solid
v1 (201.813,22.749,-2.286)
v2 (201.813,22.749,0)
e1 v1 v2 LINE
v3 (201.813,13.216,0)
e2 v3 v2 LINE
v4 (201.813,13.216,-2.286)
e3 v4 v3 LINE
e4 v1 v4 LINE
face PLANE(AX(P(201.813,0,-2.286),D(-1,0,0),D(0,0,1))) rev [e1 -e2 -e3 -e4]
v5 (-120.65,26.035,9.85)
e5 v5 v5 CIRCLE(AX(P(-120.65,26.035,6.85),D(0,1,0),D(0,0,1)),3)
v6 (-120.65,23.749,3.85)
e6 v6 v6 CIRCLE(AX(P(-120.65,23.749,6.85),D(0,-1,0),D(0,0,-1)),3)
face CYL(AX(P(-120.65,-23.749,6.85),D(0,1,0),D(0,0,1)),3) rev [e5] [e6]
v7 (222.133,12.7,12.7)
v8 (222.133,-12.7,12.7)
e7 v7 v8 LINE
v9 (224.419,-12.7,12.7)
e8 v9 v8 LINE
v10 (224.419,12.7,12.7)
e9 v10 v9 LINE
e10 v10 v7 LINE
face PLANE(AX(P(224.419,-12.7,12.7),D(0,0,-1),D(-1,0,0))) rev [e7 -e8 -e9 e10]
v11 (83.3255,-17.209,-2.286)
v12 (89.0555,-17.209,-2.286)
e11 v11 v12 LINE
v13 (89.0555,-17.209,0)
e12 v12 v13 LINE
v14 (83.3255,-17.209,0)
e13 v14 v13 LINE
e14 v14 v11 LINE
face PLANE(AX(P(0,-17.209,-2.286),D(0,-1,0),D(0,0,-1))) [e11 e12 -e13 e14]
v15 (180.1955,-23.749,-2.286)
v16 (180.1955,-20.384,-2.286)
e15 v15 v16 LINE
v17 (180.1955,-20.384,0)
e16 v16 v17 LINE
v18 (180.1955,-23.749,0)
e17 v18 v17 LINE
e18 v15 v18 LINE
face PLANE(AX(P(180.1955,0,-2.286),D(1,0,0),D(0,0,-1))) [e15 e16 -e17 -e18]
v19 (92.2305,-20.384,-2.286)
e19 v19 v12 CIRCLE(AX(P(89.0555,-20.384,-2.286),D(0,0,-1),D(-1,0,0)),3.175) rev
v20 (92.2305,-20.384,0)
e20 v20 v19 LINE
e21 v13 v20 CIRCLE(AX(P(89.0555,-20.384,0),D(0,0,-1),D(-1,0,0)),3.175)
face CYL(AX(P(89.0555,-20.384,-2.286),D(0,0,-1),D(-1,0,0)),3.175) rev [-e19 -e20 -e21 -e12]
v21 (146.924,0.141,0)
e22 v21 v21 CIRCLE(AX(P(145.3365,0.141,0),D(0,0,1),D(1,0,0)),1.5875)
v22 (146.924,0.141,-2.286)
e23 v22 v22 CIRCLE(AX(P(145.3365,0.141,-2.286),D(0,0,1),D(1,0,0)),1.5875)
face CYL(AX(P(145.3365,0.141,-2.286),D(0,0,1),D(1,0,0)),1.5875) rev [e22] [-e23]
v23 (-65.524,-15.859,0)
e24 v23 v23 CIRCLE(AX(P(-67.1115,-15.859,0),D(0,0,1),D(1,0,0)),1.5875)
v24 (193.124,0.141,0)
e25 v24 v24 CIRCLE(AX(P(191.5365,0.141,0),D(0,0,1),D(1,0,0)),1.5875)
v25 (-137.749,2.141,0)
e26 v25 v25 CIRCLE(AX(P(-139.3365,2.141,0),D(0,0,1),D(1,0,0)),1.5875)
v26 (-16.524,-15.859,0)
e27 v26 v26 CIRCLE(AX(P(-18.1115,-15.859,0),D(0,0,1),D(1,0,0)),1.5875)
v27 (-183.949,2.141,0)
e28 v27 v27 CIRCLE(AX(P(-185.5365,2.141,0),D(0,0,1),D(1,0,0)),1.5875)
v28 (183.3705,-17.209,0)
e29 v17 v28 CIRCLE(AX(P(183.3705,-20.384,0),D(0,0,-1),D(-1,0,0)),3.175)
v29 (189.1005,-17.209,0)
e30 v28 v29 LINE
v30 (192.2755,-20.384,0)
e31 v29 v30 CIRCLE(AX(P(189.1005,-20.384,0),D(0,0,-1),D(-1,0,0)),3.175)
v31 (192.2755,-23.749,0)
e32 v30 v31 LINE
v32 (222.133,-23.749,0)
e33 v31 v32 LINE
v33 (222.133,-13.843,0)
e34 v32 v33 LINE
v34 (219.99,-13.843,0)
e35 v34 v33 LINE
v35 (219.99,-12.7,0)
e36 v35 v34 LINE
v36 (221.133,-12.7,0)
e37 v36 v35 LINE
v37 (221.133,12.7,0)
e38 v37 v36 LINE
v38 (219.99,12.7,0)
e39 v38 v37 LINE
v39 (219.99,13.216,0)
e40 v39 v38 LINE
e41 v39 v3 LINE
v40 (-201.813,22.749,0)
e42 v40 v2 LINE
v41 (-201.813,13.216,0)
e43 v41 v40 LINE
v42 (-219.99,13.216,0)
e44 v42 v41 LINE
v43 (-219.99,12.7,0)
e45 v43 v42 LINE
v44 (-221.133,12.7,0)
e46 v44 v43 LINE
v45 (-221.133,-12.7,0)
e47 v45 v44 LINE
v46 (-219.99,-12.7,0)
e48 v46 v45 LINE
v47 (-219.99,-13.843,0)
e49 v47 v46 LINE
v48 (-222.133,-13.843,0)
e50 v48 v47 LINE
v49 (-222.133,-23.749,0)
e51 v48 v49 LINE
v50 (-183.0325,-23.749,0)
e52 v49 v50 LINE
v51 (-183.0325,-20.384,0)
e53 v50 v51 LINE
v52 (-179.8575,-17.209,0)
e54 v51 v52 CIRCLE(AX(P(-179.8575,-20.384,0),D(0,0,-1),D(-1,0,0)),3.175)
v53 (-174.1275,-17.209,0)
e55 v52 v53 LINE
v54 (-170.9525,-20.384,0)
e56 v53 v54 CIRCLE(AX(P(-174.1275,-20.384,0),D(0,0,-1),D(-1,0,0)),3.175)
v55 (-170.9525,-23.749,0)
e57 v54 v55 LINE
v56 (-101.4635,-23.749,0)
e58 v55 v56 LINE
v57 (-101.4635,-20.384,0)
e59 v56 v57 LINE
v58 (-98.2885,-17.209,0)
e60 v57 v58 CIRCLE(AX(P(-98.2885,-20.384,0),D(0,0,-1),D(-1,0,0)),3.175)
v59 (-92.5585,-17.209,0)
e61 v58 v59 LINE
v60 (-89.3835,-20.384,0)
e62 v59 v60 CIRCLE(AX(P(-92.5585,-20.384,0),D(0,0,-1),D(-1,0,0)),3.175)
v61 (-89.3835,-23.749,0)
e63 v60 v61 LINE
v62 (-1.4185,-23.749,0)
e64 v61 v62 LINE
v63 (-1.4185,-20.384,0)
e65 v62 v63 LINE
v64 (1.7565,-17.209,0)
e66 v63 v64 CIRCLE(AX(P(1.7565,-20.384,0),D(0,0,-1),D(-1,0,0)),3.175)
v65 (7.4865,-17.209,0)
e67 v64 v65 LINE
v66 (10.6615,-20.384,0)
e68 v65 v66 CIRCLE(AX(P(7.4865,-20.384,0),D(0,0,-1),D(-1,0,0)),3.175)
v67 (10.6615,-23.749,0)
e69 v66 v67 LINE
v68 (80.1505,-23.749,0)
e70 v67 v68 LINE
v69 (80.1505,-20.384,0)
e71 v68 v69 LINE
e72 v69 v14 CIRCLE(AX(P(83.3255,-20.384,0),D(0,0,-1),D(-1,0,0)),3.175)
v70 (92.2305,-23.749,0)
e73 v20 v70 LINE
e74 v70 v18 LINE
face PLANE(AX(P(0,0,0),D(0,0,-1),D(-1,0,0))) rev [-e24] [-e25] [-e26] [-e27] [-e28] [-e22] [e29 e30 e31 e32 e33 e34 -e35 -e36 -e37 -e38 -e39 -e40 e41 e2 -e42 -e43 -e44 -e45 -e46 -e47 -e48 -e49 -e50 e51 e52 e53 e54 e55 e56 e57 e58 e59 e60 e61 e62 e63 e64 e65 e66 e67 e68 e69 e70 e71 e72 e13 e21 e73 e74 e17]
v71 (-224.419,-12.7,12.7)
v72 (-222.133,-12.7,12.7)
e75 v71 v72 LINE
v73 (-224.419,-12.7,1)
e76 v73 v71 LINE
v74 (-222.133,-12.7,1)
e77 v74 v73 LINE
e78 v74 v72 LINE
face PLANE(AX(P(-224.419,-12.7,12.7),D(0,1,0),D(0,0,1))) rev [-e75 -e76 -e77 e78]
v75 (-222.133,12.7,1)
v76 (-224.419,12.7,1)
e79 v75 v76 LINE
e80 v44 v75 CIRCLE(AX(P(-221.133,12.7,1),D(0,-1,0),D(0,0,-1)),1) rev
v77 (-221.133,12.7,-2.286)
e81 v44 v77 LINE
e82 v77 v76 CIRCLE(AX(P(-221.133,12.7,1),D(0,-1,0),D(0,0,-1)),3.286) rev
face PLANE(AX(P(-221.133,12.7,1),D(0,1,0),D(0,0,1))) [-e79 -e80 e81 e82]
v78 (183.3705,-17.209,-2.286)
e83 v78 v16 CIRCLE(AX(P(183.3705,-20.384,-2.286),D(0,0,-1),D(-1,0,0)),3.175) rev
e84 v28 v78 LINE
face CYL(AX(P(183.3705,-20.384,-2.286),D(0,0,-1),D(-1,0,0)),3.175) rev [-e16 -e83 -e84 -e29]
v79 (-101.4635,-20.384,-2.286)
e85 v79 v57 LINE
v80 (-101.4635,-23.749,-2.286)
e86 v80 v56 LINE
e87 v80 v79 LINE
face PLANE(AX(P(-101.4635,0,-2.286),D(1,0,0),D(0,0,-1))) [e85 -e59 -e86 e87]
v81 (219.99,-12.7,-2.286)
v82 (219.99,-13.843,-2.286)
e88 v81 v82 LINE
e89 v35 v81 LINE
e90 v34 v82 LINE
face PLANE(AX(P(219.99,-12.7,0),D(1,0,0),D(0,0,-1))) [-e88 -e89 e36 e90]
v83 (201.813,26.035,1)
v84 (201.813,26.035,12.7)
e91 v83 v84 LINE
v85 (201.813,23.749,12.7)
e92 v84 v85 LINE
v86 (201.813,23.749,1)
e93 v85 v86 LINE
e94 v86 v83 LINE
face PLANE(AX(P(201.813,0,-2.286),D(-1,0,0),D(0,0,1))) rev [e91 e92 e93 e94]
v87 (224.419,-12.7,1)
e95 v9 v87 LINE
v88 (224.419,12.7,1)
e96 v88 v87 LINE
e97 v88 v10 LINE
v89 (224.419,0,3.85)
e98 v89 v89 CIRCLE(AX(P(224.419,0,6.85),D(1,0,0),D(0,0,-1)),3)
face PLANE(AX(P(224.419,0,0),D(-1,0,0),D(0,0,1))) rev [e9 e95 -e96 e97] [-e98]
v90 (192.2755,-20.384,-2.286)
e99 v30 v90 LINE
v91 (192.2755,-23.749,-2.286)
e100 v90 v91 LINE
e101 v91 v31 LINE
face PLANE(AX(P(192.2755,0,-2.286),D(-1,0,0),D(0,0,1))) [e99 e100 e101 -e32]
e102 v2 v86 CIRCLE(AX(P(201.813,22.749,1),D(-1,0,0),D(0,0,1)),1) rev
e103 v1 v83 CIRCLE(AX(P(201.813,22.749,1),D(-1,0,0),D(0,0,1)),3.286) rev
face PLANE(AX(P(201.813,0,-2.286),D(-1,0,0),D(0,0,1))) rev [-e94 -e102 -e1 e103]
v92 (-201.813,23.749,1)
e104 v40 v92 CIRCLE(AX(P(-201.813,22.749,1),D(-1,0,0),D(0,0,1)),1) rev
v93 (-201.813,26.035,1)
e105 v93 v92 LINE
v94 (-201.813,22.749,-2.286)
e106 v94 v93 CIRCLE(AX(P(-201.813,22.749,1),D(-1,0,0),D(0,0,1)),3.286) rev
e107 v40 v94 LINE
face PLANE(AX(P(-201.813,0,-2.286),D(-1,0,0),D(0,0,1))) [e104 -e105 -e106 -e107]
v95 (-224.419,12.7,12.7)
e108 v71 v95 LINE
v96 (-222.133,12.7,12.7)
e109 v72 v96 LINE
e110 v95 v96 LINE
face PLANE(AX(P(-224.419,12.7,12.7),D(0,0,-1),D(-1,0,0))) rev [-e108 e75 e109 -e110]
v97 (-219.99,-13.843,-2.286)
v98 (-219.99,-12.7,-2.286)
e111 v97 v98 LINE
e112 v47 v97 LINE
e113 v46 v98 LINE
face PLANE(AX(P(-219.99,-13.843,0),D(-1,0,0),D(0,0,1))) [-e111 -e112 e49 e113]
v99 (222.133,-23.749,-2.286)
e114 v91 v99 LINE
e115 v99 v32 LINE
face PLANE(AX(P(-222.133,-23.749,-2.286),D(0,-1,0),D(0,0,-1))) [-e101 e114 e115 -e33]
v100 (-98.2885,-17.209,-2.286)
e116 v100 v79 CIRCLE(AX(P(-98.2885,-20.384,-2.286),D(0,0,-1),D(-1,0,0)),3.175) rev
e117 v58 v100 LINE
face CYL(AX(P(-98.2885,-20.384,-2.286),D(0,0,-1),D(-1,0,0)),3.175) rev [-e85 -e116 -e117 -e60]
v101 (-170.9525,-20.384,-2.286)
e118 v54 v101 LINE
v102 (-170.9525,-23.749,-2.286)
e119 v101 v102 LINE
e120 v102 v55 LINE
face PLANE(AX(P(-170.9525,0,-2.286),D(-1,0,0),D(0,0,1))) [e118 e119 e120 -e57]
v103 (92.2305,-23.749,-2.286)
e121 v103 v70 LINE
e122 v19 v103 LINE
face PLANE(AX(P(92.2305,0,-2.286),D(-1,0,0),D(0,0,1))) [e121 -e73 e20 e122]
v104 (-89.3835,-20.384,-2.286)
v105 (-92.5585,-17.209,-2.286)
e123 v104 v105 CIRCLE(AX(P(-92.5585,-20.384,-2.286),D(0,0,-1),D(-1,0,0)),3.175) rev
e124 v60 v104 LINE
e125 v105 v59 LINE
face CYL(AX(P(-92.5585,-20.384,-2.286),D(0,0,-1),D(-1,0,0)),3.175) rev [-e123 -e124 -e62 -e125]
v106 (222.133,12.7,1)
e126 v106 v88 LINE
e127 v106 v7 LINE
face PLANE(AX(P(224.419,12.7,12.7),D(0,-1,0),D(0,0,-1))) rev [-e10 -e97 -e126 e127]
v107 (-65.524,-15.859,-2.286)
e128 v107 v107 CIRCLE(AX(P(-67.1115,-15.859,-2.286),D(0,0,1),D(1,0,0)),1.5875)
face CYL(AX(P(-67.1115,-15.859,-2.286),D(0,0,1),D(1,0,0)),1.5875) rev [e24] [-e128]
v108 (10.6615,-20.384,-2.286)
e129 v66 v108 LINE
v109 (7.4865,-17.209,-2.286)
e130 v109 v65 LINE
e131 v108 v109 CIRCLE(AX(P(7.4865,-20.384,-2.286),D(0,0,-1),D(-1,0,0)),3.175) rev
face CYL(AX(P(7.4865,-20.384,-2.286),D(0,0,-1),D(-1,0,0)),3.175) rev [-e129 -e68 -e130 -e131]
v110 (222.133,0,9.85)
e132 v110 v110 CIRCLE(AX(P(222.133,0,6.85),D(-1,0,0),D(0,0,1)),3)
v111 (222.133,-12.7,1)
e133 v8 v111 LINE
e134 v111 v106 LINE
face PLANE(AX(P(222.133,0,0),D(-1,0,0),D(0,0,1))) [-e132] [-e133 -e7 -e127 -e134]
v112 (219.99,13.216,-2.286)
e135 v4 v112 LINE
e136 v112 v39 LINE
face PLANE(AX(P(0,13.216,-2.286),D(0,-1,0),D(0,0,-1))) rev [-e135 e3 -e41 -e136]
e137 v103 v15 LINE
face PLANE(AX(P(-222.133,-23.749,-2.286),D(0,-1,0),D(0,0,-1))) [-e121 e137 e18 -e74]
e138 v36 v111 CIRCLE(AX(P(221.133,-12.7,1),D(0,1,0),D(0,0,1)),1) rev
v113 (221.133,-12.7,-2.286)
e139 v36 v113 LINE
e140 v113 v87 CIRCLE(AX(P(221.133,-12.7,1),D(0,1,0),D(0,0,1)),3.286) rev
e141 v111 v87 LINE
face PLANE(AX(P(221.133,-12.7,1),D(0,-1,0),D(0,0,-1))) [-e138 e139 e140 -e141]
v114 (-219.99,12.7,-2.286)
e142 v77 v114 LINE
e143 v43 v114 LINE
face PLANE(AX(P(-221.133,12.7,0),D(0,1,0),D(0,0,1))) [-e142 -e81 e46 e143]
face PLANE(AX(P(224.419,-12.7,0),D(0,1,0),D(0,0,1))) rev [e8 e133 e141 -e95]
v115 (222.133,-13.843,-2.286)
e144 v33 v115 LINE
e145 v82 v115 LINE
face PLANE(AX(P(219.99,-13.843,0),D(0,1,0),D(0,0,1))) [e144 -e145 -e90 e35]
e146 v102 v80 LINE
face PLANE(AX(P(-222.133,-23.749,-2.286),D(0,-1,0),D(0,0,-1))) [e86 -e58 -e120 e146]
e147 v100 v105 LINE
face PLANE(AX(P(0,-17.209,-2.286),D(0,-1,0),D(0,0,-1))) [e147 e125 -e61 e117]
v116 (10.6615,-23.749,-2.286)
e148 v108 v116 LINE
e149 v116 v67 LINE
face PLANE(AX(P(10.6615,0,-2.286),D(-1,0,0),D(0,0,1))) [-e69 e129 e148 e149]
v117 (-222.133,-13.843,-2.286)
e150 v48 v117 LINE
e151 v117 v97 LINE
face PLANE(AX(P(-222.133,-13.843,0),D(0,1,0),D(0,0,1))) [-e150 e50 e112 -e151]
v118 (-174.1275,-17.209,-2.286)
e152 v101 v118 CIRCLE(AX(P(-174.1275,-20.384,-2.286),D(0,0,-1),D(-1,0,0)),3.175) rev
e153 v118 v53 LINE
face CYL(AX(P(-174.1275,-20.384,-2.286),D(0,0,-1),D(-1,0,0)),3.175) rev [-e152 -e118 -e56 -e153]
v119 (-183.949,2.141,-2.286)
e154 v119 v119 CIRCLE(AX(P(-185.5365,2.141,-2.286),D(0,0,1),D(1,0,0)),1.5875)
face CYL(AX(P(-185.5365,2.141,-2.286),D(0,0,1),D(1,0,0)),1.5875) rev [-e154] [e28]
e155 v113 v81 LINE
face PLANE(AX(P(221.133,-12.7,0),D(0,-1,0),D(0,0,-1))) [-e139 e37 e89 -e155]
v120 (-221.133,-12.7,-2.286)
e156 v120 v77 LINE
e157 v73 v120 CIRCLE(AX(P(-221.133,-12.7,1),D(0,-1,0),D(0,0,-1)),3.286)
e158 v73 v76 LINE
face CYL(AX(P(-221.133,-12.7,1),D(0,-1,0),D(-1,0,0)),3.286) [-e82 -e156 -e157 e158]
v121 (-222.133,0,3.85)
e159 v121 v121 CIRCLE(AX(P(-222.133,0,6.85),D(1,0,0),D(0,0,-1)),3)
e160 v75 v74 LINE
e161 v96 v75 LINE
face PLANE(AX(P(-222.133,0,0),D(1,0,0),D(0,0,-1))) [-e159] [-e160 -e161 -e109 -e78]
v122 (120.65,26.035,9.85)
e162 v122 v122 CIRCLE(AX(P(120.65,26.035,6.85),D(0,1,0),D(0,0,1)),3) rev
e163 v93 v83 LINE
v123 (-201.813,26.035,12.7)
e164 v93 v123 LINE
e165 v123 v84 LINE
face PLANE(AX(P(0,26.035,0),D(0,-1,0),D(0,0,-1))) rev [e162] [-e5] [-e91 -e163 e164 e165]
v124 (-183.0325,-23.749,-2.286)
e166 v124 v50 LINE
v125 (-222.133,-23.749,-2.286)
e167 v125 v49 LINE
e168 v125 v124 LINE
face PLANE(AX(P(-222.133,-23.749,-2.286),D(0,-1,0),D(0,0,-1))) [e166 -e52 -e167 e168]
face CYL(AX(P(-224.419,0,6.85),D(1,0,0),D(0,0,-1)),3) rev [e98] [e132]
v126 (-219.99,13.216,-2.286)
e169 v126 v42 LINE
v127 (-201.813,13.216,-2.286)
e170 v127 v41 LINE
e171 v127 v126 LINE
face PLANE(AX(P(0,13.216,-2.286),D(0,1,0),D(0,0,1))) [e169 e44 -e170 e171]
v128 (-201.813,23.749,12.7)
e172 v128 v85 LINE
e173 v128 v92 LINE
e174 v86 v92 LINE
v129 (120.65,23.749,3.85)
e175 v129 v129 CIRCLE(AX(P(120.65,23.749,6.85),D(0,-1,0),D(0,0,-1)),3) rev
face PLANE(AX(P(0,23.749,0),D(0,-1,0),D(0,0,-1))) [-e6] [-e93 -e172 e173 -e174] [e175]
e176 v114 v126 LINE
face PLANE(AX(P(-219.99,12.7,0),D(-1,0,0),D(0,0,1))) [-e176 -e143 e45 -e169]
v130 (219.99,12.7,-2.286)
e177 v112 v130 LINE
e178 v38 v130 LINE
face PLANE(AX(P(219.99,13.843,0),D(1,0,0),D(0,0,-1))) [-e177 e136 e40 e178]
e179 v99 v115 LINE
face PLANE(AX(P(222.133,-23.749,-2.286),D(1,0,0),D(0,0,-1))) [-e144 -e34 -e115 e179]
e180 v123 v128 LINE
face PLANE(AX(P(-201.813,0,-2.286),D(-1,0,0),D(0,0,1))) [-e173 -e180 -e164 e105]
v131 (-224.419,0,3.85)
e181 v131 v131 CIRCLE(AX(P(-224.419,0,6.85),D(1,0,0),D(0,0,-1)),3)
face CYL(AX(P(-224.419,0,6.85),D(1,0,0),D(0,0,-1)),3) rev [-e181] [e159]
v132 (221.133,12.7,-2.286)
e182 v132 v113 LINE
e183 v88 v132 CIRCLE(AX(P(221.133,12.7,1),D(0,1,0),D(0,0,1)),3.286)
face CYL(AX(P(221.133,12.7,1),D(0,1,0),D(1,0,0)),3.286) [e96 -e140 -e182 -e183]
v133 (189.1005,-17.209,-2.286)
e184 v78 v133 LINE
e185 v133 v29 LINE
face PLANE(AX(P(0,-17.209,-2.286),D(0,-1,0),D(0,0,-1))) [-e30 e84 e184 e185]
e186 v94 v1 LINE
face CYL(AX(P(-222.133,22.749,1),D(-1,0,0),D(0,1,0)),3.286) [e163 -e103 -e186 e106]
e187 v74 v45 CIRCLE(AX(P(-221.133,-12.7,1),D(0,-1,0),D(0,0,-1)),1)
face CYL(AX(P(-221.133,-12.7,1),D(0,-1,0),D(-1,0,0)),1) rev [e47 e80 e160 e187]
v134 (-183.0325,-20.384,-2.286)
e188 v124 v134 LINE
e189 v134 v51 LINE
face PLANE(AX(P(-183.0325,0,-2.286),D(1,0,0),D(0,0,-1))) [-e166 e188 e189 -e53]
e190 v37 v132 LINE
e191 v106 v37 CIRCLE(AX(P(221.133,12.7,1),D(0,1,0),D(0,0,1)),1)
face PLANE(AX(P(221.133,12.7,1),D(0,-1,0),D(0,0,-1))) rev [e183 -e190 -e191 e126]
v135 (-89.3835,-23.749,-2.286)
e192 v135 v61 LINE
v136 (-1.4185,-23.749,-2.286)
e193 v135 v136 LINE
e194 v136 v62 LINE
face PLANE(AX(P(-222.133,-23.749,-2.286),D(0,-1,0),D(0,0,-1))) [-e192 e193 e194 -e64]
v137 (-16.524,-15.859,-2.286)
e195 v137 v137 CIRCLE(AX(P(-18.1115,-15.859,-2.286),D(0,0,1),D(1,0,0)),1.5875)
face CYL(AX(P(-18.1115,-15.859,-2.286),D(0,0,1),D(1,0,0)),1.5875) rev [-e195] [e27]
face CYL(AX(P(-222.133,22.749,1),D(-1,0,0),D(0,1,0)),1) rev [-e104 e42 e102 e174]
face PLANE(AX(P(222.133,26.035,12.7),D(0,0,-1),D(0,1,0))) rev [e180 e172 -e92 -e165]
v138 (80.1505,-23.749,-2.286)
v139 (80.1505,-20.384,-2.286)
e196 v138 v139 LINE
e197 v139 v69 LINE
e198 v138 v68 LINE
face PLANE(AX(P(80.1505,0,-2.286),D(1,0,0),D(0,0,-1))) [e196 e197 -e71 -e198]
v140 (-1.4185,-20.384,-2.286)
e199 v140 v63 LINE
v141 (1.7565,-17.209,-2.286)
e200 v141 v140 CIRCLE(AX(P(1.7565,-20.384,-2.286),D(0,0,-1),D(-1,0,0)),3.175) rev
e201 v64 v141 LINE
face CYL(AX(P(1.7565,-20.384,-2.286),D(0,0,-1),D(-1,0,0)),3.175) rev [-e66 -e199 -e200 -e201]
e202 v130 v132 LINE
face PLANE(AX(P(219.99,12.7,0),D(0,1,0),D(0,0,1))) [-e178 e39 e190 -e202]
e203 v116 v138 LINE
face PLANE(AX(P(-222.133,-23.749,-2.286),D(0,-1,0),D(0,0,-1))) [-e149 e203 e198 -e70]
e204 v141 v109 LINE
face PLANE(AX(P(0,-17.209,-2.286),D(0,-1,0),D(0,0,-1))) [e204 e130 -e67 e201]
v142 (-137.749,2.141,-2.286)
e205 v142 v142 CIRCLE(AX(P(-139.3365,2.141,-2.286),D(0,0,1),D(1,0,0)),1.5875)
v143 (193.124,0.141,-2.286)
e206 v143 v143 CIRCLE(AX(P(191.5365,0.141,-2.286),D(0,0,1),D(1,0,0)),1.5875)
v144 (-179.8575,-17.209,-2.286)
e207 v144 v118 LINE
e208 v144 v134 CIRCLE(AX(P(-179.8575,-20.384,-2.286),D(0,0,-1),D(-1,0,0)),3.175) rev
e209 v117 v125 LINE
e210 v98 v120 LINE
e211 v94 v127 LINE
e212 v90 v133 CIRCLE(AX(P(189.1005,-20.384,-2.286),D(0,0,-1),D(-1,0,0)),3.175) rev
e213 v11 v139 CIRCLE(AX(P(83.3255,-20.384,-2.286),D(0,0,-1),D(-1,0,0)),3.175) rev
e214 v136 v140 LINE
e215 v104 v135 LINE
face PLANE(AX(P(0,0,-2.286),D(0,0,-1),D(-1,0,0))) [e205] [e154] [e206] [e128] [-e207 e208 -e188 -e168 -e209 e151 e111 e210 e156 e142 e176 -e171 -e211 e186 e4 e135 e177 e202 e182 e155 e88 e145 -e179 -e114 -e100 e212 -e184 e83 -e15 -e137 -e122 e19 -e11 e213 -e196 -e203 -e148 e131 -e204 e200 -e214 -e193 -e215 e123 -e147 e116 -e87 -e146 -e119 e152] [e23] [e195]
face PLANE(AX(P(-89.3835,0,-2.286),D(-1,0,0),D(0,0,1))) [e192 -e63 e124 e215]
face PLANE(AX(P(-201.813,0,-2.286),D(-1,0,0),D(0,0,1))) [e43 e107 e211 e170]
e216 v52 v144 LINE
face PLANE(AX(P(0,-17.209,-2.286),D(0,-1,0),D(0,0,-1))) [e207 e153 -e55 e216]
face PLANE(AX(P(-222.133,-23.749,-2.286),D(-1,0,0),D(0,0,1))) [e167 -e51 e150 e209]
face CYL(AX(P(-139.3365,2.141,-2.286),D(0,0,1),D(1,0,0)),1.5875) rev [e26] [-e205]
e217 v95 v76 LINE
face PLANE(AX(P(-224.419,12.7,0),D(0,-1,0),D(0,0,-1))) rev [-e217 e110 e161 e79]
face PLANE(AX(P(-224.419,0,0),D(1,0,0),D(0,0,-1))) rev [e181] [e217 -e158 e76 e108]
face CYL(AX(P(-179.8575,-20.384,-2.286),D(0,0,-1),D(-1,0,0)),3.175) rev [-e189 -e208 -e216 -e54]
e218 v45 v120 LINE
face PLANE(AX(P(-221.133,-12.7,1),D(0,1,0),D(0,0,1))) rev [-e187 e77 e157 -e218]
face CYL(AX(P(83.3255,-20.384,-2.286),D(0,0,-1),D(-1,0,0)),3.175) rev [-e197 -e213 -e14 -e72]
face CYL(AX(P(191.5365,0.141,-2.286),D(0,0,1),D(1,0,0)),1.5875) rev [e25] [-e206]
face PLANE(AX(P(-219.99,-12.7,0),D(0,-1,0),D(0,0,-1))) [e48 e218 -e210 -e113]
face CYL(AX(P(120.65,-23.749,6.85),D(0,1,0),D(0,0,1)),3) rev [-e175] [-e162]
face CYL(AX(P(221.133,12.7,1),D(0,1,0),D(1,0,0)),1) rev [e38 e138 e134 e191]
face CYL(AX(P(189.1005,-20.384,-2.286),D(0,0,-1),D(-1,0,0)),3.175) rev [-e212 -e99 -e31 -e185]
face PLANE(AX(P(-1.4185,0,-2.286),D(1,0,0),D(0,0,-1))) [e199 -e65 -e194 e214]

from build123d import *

# Parameters (mm, degrees)
SKETCH1_W                     = 444.26599996
SKETCH1_H                     = 47.498
BASE_FLANGE1_DEPTH            = 2.286
EDGE_FLANGE1_STRIP_W          = 11.144
EDGE_FLANGE1_STRIP_H          = 2.286
EDGE_FLANGE1_STRIP_CUT_DEPTH  = 25.4
EDGE_FLANGE1_RELIEF_W         = 12.287
EDGE_FLANGE1_RELIEF_H         = 1.143
EDGE_FLANGE1_RELIEF_CUT_DEPTH = 2.286
EDGE_FLANGE1_DEPTH            = 25.4
EDGE_FLANGE2_STRIP_W          = 11.144
EDGE_FLANGE2_STRIP_H          = 2.286
EDGE_FLANGE2_STRIP_CUT_DEPTH  = 25.4
EDGE_FLANGE2_RELIEF_W         = 12.287
EDGE_FLANGE2_RELIEF_H         = 1.143
EDGE_FLANGE2_RELIEF_CUT_DEPTH = 2.286
EDGE_FLANGE2_DEPTH            = 25.4
EDGE_FLANGE6_STRIP_W          = 11.144
EDGE_FLANGE6_STRIP_H          = 2.286
EDGE_FLANGE6_STRIP_CUT_DEPTH  = 444.26599996
EDGE_FLANGE6_DEPTH            = 444.26599996
SKETCH52_R                    = 3
CUT_EXTRUDE2_DEPTH            = 231.225159807
SKETCH53_R                    = 3
CUT_EXTRUDE3_DEPTH            = 450.771788169
SKETCH54_W                    = 20.32
SKETCH54_H                    = 5.08
SKETCH54_H_2                  = 7.739
SKETCH54_H_3                  = 4.453
CUT_EXTRUDE4_DEPTH            = 227.280796306
CUT_EXTRUDE5_DEPTH            = 227.280796306
FILLET1_R                     = 3.175
SKETCH57_R                    = 1.5875
CUT_EXTRUDE6_DEPTH            = 227.280796306


# Sheet-metal steps are written as plain solids
with BuildPart() as part:
    # Sketch1 → Base-Flange1 (new body)
    with BuildSketch(Plane.XY):
        Rectangle(SKETCH1_W, SKETCH1_H)
    extrude(amount=-BASE_FLANGE1_DEPTH)

    # Edge-Flange1 strip (across the edge) → Edge-Flange1 strip cut (cut)
    with BuildSketch(Plane(origin=(222.13299998, -12.7, 0), x_dir=(-1, 0, 0), z_dir=(0, 1, 0))):
        with Locations((-4.572, -1.143)):
            Rectangle(EDGE_FLANGE1_STRIP_W, EDGE_FLANGE1_STRIP_H)
    extrude(amount=EDGE_FLANGE1_STRIP_CUT_DEPTH, mode=Mode.SUBTRACT)

    # Edge-Flange1 relief (on the sheet) → Edge-Flange1 relief cut (cut)
    with BuildSketch(Plane(origin=(221.13299998, -12.7, 0), x_dir=(-1, 0, 0), z_dir=(0, 0, 1))):
        with Locations((-5.0005, 0.5715)):
            Rectangle(EDGE_FLANGE1_RELIEF_W, EDGE_FLANGE1_RELIEF_H)
        with Locations((-5.0005, -25.9715)):
            Rectangle(EDGE_FLANGE1_RELIEF_W, EDGE_FLANGE1_RELIEF_H)
    extrude(amount=-EDGE_FLANGE1_RELIEF_CUT_DEPTH, mode=Mode.SUBTRACT)

    # Edge-Flange1 section (across the edge) → Edge-Flange1 (add)
    with BuildSketch(Plane(origin=(222.13299998, -12.7, 0), x_dir=(-1, 0, 0), z_dir=(0, 1, 0))):
        with BuildLine():
            Line((-2.286, 1), (-2.286, 12.7))
            Line((-2.286, 12.7), (0, 12.7))
            Line((0, 12.7), (0, 1))
            ThreePointArc((0, 1), (0.292893219, 0.292893219), (1, 0))
            Line((1, 0), (1, -2.286))
            ThreePointArc((1, -2.286), (-1.323552883, -1.323552883), (-2.286, 1))
        make_face()
    extrude(amount=EDGE_FLANGE1_DEPTH)

    # Edge-Flange2 strip (across the edge) → Edge-Flange2 strip cut (cut)
    with BuildSketch(Plane(origin=(-222.13299998, 12.7, 0), x_dir=(1, 0, 0), z_dir=(0, -1, 0))):
        with Locations((-4.572, -1.143)):
            Rectangle(EDGE_FLANGE2_STRIP_W, EDGE_FLANGE2_STRIP_H)
    extrude(amount=EDGE_FLANGE2_STRIP_CUT_DEPTH, mode=Mode.SUBTRACT)

    # Edge-Flange2 relief (on the sheet) → Edge-Flange2 relief cut (cut)
    with BuildSketch(Plane(origin=(-221.13299998, 12.7, 0), x_dir=(1, 0, 0), z_dir=(0, 0, 1))):
        with Locations((-5.0005, 0.5715)):
            Rectangle(EDGE_FLANGE2_RELIEF_W, EDGE_FLANGE2_RELIEF_H)
        with Locations((-5.0005, -25.9715)):
            Rectangle(EDGE_FLANGE2_RELIEF_W, EDGE_FLANGE2_RELIEF_H)
    extrude(amount=-EDGE_FLANGE2_RELIEF_CUT_DEPTH, mode=Mode.SUBTRACT)

    # Edge-Flange2 section (across the edge) → Edge-Flange2 (add)
    with BuildSketch(Plane(origin=(-222.13299998, 12.7, 0), x_dir=(1, 0, 0), z_dir=(0, -1, 0))):
        with BuildLine():
            Line((-2.286, 1), (-2.286, 12.7))
            Line((-2.286, 12.7), (0, 12.7))
            Line((0, 12.7), (0, 1))
            ThreePointArc((0, 1), (0.292893219, 0.292893219), (1, 0))
            Line((1, 0), (1, -2.286))
            ThreePointArc((1, -2.286), (-1.323552883, -1.323552883), (-2.286, 1))
        make_face()
    extrude(amount=EDGE_FLANGE2_DEPTH)

    # Edge-Flange6 strip (across the edge) → Edge-Flange6 strip cut (cut)
    with BuildSketch(Plane(origin=(222.13299998, 23.749, 0), x_dir=(0, -1, 0), z_dir=(-1, 0, 0))):
        with Locations((-4.572, -1.143)):
            Rectangle(EDGE_FLANGE6_STRIP_W, EDGE_FLANGE6_STRIP_H)
    extrude(amount=EDGE_FLANGE6_STRIP_CUT_DEPTH, mode=Mode.SUBTRACT)

    # Edge-Flange6 section (across the edge) → Edge-Flange6 (add)
    with BuildSketch(Plane(origin=(222.13299998, 23.749, 0), x_dir=(0, -1, 0), z_dir=(-1, 0, 0))):
        with BuildLine():
            Line((-2.286, 1), (-2.286, 12.7))
            Line((-2.286, 12.7), (0, 12.7))
            Line((0, 12.7), (0, 1))
            ThreePointArc((0, 1), (0.292893219, 0.292893219), (1, 0))
            Line((1, 0), (1, -2.286))
            ThreePointArc((1, -2.286), (-1.323552883, -1.323552883), (-2.286, 1))
        make_face()
    extrude(amount=EDGE_FLANGE6_DEPTH)

    # Sketch52 → Cut-Extrude2 (cut, through all)
    with BuildSketch(Plane(origin=(0, 26.035, 0), x_dir=(1, 0, 0), z_dir=(0, 1, 0))):
        with Locations(Location((120.65, -6.85, 0), (0, 0, 270))):
            Circle(SKETCH52_R)
        with Locations(Location((-120.65, -6.85, 0), (0, 0, 270))):
            Circle(SKETCH52_R)
    extrude(amount=-CUT_EXTRUDE2_DEPTH, mode=Mode.SUBTRACT)

    # Sketch53 → Cut-Extrude3 (cut, through all)
    with BuildSketch(Plane(origin=(224.41899998, 0, 0), x_dir=(0, 0, -1), z_dir=(1, 0, 0))):
        with Locations((-6.85, 0)):
            Circle(SKETCH53_R)
    extrude(amount=-CUT_EXTRUDE3_DEPTH, mode=Mode.SUBTRACT)

    # Sketch54 → Cut-Extrude4 (cut, symmetric)
    with BuildSketch(Plane.XY):
        with Locations((211.97299998, 15.756)):
            Rectangle(SKETCH54_W, SKETCH54_H)
        with Locations((211.97299998, 22.1655)):
            Rectangle(SKETCH54_W, SKETCH54_H_2)
        with Locations((211.97299998, 20.5225)):
            Rectangle(SKETCH54_W, SKETCH54_H_3)
    cut_extrude4 = extrude(amount=CUT_EXTRUDE4_DEPTH, both=True, mode=Mode.SUBTRACT)

    # Mirror1: Cut-Extrude4 across plane
    add(cut_extrude4.mirror(Plane(origin=(0, 0, 0), x_dir=(0, 0, 1), z_dir=(1, 0, 0))), mode=Mode.SUBTRACT)

    # Sketch55 → Cut-Extrude5 (cut, through all)
    # profile 1 of 15: a face of its own
    with BuildSketch(Plane.XY):
        Polygon((-179.589939095, -42.289), (-174.395060873, -42.289), (-172.452499984, -40.346439111), (-172.452499984, -26.101102448), (-170.952499984, -24.601102448), (-170.952499984, -18.896897552), (-172.640397536, -17.209), (-181.344602432, -17.209), (-183.032499984, -18.896897552), (-183.032499984, -24.601102448), (-181.532499984, -26.101102448), (-181.532499984, -40.346439111), align=None)
        with BuildLine():
            Line((-174.992499984, -39.294336663), (-175.447163321, -39.749))
            Line((-175.447163321, -39.749), (-178.537836647, -39.749))
            Line((-178.537836647, -39.749), (-178.992499984, -39.294336663))
            Line((-178.992499984, -39.294336663), (-178.992499984, -23.949))
            ThreePointArc((-178.992499984, -23.949), (-179.051078628, -23.807578644), (-179.192499984, -23.749))
            Line((-179.192499984, -23.749), (-180.292499984, -23.749))
            Line((-180.292499984, -23.749), (-180.492499984, -23.549))
            Line((-180.492499984, -23.549), (-180.492499984, -19.949))
            Line((-180.492499984, -19.949), (-180.292499984, -19.749))
            Line((-180.292499984, -19.749), (-173.692499984, -19.749))
            Line((-173.692499984, -19.749), (-173.492499984, -19.949))
            Line((-173.492499984, -19.949), (-173.492499984, -23.549))
            Line((-173.492499984, -23.549), (-173.692499984, -23.749))
            Line((-173.692499984, -23.749), (-174.792499984, -23.749))
            ThreePointArc((-174.792499984, -23.749), (-174.93392134, -23.807578644), (-174.992499984, -23.949))
            Line((-174.992499984, -23.949), (-174.992499984, -39.294336663))
        make_face(mode=Mode.SUBTRACT)
    # profile 2 of 15: a face of its own
    with BuildSketch(Plane.XY):
        Polygon((-172.640397536, -17.209), (-170.952499984, -18.896897552), (-170.952499984, -17.209), align=None)
    # profile 3 of 15: a face of its own
    with BuildSketch(Plane.XY):
        Polygon((-183.032499984, -17.209), (-183.032499984, -18.896897552), (-181.344602432, -17.209), align=None)
    # profile 4 of 15: a face of its own
    with BuildSketch(Plane.XY):
        Polygon((-90.883499992, -40.346439111), (-90.883499992, -26.101102448), (-89.383499992, -24.601102448), (-89.383499992, -18.896897552), (-91.071397544, -17.209), (-99.77560244, -17.209), (-101.463499992, -18.896897552), (-101.463499992, -24.601102448), (-99.963499992, -26.101102448), (-99.963499992, -40.346439111), (-98.020939103, -42.289), (-92.826060881, -42.289), align=None)
        with BuildLine():
            ThreePointArc((-93.223499992, -23.749), (-93.364921348, -23.807578644), (-93.423499992, -23.949))
            Line((-93.423499992, -23.949), (-93.423499992, -39.294336663))
            Line((-93.423499992, -39.294336663), (-93.878163329, -39.749))
            Line((-93.878163329, -39.749), (-96.968836655, -39.749))
            Line((-96.968836655, -39.749), (-97.423499992, -39.294336663))
            Line((-97.423499992, -39.294336663), (-97.423499992, -23.949))
            ThreePointArc((-97.423499992, -23.949), (-97.482078636, -23.807578644), (-97.623499992, -23.749))
            Line((-97.623499992, -23.749), (-98.723499992, -23.749))
            Line((-98.723499992, -23.749), (-98.923499992, -23.549))
            Line((-98.923499992, -23.549), (-98.923499992, -19.949))
            Line((-98.923499992, -19.949), (-98.723499992, -19.749))
            Line((-98.723499992, -19.749), (-92.123499992, -19.749))
            Line((-92.123499992, -19.749), (-91.923499992, -19.949))
            Line((-91.923499992, -19.949), (-91.923499992, -23.549))
            Line((-91.923499992, -23.549), (-92.123499992, -23.749))
            Line((-92.123499992, -23.749), (-93.223499992, -23.749))
        make_face(mode=Mode.SUBTRACT)
    # profile 5 of 15: a face of its own
    with BuildSketch(Plane.XY):
        Polygon((-91.071397544, -17.209), (-89.383499992, -18.896897552), (-89.383499992, -17.209), align=None)
    # profile 6 of 15: a face of its own
    with BuildSketch(Plane.XY):
        Polygon((-101.463499992, -18.896897552), (-99.77560244, -17.209), (-101.463499992, -17.209), align=None)
    # profile 7 of 15: a face of its own
    with BuildSketch(Plane.XY):
        Polygon((2.024060897, -42.289), (7.218939119, -42.289), (9.161500008, -40.346439111), (9.161500008, -26.101102448), (10.661500008, -24.601102448), (10.661500008, -18.896897552), (8.973602456, -17.209), (0.26939756, -17.209), (-1.418499992, -18.896897552), (-1.418499992, -24.601102448), (0.081500008, -26.101102448), (0.081500008, -40.346439111), align=None)
        with BuildLine():
            Line((6.621500008, -39.294336663), (6.166836671, -39.749))
            Line((6.166836671, -39.749), (3.076163345, -39.749))
            Line((3.076163345, -39.749), (2.621500008, -39.294336663))
            Line((2.621500008, -39.294336663), (2.621500008, -23.949))
            ThreePointArc((2.621500008, -23.949), (2.562921364, -23.807578644), (2.421500008, -23.749))
            Line((2.421500008, -23.749), (1.321500008, -23.749))
            Line((1.321500008, -23.749), (1.121500008, -23.549))
            Line((1.121500008, -23.549), (1.121500008, -19.949))
            Line((1.121500008, -19.949), (1.321500008, -19.749))
            Line((1.321500008, -19.749), (7.921500008, -19.749))
            Line((7.921500008, -19.749), (8.121500008, -19.949))
            Line((8.121500008, -19.949), (8.121500008, -23.549))
            Line((8.121500008, -23.549), (7.921500008, -23.749))
            Line((7.921500008, -23.749), (6.821500008, -23.749))
            ThreePointArc((6.821500008, -23.749), (6.680078652, -23.807578644), (6.621500008, -23.949))
            Line((6.621500008, -23.949), (6.621500008, -39.294336663))
        make_face(mode=Mode.SUBTRACT)
    # profile 8 of 15: a face of its own
    with BuildSketch(Plane.XY):
        Polygon((8.973602456, -17.209), (10.661500008, -18.896897552), (10.661500008, -17.209), align=None)
    # profile 9 of 15: a face of its own
    with BuildSketch(Plane.XY):
        Polygon((-1.418499992, -17.209), (-1.418499992, -18.896897552), (0.26939756, -17.209), align=None)
    # profile 10 of 15: a face of its own
    with BuildSketch(Plane.XY):
        Polygon((90.7305, -40.346439111), (90.7305, -26.101102448), (92.2305, -24.601102448), (92.2305, -18.896897552), (90.542602448, -17.209), (81.838397552, -17.209), (80.1505, -18.896897552), (80.1505, -24.601102448), (81.6505, -26.101102448), (81.6505, -40.346439111), (83.593060889, -42.289), (88.787939111, -42.289), align=None)
        with BuildLine():
            ThreePointArc((88.3905, -23.749), (88.249078644, -23.807578644), (88.1905, -23.949))
            Line((88.1905, -23.949), (88.1905, -39.294336663))
            Line((88.1905, -39.294336663), (87.735836663, -39.749))
            Line((87.735836663, -39.749), (84.645163337, -39.749))
            Line((84.645163337, -39.749), (84.1905, -39.294336663))
            Line((84.1905, -39.294336663), (84.1905, -23.949))
            ThreePointArc((84.1905, -23.949), (84.131921356, -23.807578644), (83.9905, -23.749))
            Line((83.9905, -23.749), (82.8905, -23.749))
            Line((82.8905, -23.749), (82.6905, -23.549))
            Line((82.6905, -23.549), (82.6905, -19.949))
            Line((82.6905, -19.949), (82.8905, -19.749))
            Line((82.8905, -19.749), (89.4905, -19.749))
            Line((89.4905, -19.749), (89.6905, -19.949))
            Line((89.6905, -19.949), (89.6905, -23.549))
            Line((89.6905, -23.549), (89.4905, -23.749))
            Line((89.4905, -23.749), (88.3905, -23.749))
        make_face(mode=Mode.SUBTRACT)
    # profile 11 of 15: a face of its own
    with BuildSketch(Plane.XY):
        Polygon((90.542602448, -17.209), (92.2305, -18.896897552), (92.2305, -17.209), align=None)
    # profile 12 of 15: a face of its own
    with BuildSketch(Plane.XY):
        Polygon((80.1505, -18.896897552), (81.838397552, -17.209), (80.1505, -17.209), align=None)
    # profile 13 of 15: a face of its own
    with BuildSketch(Plane.XY):
        Polygon((183.638060889, -42.289), (188.832939111, -42.289), (190.7755, -40.346439111), (190.7755, -26.101102448), (192.2755, -24.601102448), (192.2755, -18.896897552), (190.587602448, -17.209), (181.883397552, -17.209), (180.1955, -18.896897552), (180.1955, -24.601102448), (181.6955, -26.101102448), (181.6955, -40.346439111), align=None)
        with BuildLine():
            Line((188.2355, -39.294336663), (187.780836663, -39.749))
            Line((187.780836663, -39.749), (184.690163337, -39.749))
            Line((184.690163337, -39.749), (184.2355, -39.294336663))
            Line((184.2355, -39.294336663), (184.2355, -23.949))
            ThreePointArc((184.2355, -23.949), (184.176921356, -23.807578644), (184.0355, -23.749))
            Line((184.0355, -23.749), (182.9355, -23.749))
            Line((182.9355, -23.749), (182.7355, -23.549))
            Line((182.7355, -23.549), (182.7355, -19.949))
            Line((182.7355, -19.949), (182.9355, -19.749))
            Line((182.9355, -19.749), (189.5355, -19.749))
            Line((189.5355, -19.749), (189.7355, -19.949))
            Line((189.7355, -19.949), (189.7355, -23.549))
            Line((189.7355, -23.549), (189.5355, -23.749))
            Line((189.5355, -23.749), (188.4355, -23.749))
            ThreePointArc((188.4355, -23.749), (188.294078644, -23.807578644), (188.2355, -23.949))
            Line((188.2355, -23.949), (188.2355, -39.294336663))
        make_face(mode=Mode.SUBTRACT)
    # profile 14 of 15: a face of its own
    with BuildSketch(Plane.XY):
        Polygon((190.587602448, -17.209), (192.2755, -18.896897552), (192.2755, -17.209), align=None)
    # profile 15 of 15: a face of its own
    with BuildSketch(Plane.XY):
        Polygon((180.1955, -17.209), (180.1955, -18.896897552), (181.883397552, -17.209), align=None)
    extrude(amount=-CUT_EXTRUDE5_DEPTH, mode=Mode.SUBTRACT)


with BuildPart() as cut_extrude5_kept_piece:
    # of the separate pieces the step leaves, the one the design keeps (cut_extrude5_pieces_kept)
    add(part.part.solids().sort_by_distance((-222.13299998, -23.749, 0))[0])

    # Fillet1
    fillet1_edges = [cut_extrude5_kept_piece.edges().sort_by_distance(p)[0] for p in [
        (-170.952499984, -17.209, -1.143),
        (-183.032499984, -17.209, -1.143),
        (-89.383499992, -17.209, -1.143),
        (-101.463499992, -17.209, -1.143),
        (10.661500008, -17.209, -1.143),
        (-1.418499992, -17.209, -1.143),
        (92.2305, -17.209, -1.143),
        (80.1505, -17.209, -1.143),
        (192.2755, -17.209, -1.143),
        (180.1955, -17.209, -1.143),
    ]]
    fillet(fillet1_edges, radius=FILLET1_R)

    # Sketch57 → Cut-Extrude6 (cut, through all)
    with BuildSketch(Plane.XY):
        with Locations((191.5365, 0.141)):
            Circle(SKETCH57_R)
        with Locations((145.3365, 0.141)):
            Circle(SKETCH57_R)
        with Locations((-18.1115, -15.859)):
            Circle(SKETCH57_R)
        with Locations((-67.1115, -15.859)):
            Circle(SKETCH57_R)
        with Locations((-139.3365, 2.141)):
            Circle(SKETCH57_R)
        with Locations((-185.5365, 2.141)):
            Circle(SKETCH57_R)
    extrude(amount=-CUT_EXTRUDE6_DEPTH, mode=Mode.SUBTRACT)


solid = cut_extrude5_kept_piece.part
